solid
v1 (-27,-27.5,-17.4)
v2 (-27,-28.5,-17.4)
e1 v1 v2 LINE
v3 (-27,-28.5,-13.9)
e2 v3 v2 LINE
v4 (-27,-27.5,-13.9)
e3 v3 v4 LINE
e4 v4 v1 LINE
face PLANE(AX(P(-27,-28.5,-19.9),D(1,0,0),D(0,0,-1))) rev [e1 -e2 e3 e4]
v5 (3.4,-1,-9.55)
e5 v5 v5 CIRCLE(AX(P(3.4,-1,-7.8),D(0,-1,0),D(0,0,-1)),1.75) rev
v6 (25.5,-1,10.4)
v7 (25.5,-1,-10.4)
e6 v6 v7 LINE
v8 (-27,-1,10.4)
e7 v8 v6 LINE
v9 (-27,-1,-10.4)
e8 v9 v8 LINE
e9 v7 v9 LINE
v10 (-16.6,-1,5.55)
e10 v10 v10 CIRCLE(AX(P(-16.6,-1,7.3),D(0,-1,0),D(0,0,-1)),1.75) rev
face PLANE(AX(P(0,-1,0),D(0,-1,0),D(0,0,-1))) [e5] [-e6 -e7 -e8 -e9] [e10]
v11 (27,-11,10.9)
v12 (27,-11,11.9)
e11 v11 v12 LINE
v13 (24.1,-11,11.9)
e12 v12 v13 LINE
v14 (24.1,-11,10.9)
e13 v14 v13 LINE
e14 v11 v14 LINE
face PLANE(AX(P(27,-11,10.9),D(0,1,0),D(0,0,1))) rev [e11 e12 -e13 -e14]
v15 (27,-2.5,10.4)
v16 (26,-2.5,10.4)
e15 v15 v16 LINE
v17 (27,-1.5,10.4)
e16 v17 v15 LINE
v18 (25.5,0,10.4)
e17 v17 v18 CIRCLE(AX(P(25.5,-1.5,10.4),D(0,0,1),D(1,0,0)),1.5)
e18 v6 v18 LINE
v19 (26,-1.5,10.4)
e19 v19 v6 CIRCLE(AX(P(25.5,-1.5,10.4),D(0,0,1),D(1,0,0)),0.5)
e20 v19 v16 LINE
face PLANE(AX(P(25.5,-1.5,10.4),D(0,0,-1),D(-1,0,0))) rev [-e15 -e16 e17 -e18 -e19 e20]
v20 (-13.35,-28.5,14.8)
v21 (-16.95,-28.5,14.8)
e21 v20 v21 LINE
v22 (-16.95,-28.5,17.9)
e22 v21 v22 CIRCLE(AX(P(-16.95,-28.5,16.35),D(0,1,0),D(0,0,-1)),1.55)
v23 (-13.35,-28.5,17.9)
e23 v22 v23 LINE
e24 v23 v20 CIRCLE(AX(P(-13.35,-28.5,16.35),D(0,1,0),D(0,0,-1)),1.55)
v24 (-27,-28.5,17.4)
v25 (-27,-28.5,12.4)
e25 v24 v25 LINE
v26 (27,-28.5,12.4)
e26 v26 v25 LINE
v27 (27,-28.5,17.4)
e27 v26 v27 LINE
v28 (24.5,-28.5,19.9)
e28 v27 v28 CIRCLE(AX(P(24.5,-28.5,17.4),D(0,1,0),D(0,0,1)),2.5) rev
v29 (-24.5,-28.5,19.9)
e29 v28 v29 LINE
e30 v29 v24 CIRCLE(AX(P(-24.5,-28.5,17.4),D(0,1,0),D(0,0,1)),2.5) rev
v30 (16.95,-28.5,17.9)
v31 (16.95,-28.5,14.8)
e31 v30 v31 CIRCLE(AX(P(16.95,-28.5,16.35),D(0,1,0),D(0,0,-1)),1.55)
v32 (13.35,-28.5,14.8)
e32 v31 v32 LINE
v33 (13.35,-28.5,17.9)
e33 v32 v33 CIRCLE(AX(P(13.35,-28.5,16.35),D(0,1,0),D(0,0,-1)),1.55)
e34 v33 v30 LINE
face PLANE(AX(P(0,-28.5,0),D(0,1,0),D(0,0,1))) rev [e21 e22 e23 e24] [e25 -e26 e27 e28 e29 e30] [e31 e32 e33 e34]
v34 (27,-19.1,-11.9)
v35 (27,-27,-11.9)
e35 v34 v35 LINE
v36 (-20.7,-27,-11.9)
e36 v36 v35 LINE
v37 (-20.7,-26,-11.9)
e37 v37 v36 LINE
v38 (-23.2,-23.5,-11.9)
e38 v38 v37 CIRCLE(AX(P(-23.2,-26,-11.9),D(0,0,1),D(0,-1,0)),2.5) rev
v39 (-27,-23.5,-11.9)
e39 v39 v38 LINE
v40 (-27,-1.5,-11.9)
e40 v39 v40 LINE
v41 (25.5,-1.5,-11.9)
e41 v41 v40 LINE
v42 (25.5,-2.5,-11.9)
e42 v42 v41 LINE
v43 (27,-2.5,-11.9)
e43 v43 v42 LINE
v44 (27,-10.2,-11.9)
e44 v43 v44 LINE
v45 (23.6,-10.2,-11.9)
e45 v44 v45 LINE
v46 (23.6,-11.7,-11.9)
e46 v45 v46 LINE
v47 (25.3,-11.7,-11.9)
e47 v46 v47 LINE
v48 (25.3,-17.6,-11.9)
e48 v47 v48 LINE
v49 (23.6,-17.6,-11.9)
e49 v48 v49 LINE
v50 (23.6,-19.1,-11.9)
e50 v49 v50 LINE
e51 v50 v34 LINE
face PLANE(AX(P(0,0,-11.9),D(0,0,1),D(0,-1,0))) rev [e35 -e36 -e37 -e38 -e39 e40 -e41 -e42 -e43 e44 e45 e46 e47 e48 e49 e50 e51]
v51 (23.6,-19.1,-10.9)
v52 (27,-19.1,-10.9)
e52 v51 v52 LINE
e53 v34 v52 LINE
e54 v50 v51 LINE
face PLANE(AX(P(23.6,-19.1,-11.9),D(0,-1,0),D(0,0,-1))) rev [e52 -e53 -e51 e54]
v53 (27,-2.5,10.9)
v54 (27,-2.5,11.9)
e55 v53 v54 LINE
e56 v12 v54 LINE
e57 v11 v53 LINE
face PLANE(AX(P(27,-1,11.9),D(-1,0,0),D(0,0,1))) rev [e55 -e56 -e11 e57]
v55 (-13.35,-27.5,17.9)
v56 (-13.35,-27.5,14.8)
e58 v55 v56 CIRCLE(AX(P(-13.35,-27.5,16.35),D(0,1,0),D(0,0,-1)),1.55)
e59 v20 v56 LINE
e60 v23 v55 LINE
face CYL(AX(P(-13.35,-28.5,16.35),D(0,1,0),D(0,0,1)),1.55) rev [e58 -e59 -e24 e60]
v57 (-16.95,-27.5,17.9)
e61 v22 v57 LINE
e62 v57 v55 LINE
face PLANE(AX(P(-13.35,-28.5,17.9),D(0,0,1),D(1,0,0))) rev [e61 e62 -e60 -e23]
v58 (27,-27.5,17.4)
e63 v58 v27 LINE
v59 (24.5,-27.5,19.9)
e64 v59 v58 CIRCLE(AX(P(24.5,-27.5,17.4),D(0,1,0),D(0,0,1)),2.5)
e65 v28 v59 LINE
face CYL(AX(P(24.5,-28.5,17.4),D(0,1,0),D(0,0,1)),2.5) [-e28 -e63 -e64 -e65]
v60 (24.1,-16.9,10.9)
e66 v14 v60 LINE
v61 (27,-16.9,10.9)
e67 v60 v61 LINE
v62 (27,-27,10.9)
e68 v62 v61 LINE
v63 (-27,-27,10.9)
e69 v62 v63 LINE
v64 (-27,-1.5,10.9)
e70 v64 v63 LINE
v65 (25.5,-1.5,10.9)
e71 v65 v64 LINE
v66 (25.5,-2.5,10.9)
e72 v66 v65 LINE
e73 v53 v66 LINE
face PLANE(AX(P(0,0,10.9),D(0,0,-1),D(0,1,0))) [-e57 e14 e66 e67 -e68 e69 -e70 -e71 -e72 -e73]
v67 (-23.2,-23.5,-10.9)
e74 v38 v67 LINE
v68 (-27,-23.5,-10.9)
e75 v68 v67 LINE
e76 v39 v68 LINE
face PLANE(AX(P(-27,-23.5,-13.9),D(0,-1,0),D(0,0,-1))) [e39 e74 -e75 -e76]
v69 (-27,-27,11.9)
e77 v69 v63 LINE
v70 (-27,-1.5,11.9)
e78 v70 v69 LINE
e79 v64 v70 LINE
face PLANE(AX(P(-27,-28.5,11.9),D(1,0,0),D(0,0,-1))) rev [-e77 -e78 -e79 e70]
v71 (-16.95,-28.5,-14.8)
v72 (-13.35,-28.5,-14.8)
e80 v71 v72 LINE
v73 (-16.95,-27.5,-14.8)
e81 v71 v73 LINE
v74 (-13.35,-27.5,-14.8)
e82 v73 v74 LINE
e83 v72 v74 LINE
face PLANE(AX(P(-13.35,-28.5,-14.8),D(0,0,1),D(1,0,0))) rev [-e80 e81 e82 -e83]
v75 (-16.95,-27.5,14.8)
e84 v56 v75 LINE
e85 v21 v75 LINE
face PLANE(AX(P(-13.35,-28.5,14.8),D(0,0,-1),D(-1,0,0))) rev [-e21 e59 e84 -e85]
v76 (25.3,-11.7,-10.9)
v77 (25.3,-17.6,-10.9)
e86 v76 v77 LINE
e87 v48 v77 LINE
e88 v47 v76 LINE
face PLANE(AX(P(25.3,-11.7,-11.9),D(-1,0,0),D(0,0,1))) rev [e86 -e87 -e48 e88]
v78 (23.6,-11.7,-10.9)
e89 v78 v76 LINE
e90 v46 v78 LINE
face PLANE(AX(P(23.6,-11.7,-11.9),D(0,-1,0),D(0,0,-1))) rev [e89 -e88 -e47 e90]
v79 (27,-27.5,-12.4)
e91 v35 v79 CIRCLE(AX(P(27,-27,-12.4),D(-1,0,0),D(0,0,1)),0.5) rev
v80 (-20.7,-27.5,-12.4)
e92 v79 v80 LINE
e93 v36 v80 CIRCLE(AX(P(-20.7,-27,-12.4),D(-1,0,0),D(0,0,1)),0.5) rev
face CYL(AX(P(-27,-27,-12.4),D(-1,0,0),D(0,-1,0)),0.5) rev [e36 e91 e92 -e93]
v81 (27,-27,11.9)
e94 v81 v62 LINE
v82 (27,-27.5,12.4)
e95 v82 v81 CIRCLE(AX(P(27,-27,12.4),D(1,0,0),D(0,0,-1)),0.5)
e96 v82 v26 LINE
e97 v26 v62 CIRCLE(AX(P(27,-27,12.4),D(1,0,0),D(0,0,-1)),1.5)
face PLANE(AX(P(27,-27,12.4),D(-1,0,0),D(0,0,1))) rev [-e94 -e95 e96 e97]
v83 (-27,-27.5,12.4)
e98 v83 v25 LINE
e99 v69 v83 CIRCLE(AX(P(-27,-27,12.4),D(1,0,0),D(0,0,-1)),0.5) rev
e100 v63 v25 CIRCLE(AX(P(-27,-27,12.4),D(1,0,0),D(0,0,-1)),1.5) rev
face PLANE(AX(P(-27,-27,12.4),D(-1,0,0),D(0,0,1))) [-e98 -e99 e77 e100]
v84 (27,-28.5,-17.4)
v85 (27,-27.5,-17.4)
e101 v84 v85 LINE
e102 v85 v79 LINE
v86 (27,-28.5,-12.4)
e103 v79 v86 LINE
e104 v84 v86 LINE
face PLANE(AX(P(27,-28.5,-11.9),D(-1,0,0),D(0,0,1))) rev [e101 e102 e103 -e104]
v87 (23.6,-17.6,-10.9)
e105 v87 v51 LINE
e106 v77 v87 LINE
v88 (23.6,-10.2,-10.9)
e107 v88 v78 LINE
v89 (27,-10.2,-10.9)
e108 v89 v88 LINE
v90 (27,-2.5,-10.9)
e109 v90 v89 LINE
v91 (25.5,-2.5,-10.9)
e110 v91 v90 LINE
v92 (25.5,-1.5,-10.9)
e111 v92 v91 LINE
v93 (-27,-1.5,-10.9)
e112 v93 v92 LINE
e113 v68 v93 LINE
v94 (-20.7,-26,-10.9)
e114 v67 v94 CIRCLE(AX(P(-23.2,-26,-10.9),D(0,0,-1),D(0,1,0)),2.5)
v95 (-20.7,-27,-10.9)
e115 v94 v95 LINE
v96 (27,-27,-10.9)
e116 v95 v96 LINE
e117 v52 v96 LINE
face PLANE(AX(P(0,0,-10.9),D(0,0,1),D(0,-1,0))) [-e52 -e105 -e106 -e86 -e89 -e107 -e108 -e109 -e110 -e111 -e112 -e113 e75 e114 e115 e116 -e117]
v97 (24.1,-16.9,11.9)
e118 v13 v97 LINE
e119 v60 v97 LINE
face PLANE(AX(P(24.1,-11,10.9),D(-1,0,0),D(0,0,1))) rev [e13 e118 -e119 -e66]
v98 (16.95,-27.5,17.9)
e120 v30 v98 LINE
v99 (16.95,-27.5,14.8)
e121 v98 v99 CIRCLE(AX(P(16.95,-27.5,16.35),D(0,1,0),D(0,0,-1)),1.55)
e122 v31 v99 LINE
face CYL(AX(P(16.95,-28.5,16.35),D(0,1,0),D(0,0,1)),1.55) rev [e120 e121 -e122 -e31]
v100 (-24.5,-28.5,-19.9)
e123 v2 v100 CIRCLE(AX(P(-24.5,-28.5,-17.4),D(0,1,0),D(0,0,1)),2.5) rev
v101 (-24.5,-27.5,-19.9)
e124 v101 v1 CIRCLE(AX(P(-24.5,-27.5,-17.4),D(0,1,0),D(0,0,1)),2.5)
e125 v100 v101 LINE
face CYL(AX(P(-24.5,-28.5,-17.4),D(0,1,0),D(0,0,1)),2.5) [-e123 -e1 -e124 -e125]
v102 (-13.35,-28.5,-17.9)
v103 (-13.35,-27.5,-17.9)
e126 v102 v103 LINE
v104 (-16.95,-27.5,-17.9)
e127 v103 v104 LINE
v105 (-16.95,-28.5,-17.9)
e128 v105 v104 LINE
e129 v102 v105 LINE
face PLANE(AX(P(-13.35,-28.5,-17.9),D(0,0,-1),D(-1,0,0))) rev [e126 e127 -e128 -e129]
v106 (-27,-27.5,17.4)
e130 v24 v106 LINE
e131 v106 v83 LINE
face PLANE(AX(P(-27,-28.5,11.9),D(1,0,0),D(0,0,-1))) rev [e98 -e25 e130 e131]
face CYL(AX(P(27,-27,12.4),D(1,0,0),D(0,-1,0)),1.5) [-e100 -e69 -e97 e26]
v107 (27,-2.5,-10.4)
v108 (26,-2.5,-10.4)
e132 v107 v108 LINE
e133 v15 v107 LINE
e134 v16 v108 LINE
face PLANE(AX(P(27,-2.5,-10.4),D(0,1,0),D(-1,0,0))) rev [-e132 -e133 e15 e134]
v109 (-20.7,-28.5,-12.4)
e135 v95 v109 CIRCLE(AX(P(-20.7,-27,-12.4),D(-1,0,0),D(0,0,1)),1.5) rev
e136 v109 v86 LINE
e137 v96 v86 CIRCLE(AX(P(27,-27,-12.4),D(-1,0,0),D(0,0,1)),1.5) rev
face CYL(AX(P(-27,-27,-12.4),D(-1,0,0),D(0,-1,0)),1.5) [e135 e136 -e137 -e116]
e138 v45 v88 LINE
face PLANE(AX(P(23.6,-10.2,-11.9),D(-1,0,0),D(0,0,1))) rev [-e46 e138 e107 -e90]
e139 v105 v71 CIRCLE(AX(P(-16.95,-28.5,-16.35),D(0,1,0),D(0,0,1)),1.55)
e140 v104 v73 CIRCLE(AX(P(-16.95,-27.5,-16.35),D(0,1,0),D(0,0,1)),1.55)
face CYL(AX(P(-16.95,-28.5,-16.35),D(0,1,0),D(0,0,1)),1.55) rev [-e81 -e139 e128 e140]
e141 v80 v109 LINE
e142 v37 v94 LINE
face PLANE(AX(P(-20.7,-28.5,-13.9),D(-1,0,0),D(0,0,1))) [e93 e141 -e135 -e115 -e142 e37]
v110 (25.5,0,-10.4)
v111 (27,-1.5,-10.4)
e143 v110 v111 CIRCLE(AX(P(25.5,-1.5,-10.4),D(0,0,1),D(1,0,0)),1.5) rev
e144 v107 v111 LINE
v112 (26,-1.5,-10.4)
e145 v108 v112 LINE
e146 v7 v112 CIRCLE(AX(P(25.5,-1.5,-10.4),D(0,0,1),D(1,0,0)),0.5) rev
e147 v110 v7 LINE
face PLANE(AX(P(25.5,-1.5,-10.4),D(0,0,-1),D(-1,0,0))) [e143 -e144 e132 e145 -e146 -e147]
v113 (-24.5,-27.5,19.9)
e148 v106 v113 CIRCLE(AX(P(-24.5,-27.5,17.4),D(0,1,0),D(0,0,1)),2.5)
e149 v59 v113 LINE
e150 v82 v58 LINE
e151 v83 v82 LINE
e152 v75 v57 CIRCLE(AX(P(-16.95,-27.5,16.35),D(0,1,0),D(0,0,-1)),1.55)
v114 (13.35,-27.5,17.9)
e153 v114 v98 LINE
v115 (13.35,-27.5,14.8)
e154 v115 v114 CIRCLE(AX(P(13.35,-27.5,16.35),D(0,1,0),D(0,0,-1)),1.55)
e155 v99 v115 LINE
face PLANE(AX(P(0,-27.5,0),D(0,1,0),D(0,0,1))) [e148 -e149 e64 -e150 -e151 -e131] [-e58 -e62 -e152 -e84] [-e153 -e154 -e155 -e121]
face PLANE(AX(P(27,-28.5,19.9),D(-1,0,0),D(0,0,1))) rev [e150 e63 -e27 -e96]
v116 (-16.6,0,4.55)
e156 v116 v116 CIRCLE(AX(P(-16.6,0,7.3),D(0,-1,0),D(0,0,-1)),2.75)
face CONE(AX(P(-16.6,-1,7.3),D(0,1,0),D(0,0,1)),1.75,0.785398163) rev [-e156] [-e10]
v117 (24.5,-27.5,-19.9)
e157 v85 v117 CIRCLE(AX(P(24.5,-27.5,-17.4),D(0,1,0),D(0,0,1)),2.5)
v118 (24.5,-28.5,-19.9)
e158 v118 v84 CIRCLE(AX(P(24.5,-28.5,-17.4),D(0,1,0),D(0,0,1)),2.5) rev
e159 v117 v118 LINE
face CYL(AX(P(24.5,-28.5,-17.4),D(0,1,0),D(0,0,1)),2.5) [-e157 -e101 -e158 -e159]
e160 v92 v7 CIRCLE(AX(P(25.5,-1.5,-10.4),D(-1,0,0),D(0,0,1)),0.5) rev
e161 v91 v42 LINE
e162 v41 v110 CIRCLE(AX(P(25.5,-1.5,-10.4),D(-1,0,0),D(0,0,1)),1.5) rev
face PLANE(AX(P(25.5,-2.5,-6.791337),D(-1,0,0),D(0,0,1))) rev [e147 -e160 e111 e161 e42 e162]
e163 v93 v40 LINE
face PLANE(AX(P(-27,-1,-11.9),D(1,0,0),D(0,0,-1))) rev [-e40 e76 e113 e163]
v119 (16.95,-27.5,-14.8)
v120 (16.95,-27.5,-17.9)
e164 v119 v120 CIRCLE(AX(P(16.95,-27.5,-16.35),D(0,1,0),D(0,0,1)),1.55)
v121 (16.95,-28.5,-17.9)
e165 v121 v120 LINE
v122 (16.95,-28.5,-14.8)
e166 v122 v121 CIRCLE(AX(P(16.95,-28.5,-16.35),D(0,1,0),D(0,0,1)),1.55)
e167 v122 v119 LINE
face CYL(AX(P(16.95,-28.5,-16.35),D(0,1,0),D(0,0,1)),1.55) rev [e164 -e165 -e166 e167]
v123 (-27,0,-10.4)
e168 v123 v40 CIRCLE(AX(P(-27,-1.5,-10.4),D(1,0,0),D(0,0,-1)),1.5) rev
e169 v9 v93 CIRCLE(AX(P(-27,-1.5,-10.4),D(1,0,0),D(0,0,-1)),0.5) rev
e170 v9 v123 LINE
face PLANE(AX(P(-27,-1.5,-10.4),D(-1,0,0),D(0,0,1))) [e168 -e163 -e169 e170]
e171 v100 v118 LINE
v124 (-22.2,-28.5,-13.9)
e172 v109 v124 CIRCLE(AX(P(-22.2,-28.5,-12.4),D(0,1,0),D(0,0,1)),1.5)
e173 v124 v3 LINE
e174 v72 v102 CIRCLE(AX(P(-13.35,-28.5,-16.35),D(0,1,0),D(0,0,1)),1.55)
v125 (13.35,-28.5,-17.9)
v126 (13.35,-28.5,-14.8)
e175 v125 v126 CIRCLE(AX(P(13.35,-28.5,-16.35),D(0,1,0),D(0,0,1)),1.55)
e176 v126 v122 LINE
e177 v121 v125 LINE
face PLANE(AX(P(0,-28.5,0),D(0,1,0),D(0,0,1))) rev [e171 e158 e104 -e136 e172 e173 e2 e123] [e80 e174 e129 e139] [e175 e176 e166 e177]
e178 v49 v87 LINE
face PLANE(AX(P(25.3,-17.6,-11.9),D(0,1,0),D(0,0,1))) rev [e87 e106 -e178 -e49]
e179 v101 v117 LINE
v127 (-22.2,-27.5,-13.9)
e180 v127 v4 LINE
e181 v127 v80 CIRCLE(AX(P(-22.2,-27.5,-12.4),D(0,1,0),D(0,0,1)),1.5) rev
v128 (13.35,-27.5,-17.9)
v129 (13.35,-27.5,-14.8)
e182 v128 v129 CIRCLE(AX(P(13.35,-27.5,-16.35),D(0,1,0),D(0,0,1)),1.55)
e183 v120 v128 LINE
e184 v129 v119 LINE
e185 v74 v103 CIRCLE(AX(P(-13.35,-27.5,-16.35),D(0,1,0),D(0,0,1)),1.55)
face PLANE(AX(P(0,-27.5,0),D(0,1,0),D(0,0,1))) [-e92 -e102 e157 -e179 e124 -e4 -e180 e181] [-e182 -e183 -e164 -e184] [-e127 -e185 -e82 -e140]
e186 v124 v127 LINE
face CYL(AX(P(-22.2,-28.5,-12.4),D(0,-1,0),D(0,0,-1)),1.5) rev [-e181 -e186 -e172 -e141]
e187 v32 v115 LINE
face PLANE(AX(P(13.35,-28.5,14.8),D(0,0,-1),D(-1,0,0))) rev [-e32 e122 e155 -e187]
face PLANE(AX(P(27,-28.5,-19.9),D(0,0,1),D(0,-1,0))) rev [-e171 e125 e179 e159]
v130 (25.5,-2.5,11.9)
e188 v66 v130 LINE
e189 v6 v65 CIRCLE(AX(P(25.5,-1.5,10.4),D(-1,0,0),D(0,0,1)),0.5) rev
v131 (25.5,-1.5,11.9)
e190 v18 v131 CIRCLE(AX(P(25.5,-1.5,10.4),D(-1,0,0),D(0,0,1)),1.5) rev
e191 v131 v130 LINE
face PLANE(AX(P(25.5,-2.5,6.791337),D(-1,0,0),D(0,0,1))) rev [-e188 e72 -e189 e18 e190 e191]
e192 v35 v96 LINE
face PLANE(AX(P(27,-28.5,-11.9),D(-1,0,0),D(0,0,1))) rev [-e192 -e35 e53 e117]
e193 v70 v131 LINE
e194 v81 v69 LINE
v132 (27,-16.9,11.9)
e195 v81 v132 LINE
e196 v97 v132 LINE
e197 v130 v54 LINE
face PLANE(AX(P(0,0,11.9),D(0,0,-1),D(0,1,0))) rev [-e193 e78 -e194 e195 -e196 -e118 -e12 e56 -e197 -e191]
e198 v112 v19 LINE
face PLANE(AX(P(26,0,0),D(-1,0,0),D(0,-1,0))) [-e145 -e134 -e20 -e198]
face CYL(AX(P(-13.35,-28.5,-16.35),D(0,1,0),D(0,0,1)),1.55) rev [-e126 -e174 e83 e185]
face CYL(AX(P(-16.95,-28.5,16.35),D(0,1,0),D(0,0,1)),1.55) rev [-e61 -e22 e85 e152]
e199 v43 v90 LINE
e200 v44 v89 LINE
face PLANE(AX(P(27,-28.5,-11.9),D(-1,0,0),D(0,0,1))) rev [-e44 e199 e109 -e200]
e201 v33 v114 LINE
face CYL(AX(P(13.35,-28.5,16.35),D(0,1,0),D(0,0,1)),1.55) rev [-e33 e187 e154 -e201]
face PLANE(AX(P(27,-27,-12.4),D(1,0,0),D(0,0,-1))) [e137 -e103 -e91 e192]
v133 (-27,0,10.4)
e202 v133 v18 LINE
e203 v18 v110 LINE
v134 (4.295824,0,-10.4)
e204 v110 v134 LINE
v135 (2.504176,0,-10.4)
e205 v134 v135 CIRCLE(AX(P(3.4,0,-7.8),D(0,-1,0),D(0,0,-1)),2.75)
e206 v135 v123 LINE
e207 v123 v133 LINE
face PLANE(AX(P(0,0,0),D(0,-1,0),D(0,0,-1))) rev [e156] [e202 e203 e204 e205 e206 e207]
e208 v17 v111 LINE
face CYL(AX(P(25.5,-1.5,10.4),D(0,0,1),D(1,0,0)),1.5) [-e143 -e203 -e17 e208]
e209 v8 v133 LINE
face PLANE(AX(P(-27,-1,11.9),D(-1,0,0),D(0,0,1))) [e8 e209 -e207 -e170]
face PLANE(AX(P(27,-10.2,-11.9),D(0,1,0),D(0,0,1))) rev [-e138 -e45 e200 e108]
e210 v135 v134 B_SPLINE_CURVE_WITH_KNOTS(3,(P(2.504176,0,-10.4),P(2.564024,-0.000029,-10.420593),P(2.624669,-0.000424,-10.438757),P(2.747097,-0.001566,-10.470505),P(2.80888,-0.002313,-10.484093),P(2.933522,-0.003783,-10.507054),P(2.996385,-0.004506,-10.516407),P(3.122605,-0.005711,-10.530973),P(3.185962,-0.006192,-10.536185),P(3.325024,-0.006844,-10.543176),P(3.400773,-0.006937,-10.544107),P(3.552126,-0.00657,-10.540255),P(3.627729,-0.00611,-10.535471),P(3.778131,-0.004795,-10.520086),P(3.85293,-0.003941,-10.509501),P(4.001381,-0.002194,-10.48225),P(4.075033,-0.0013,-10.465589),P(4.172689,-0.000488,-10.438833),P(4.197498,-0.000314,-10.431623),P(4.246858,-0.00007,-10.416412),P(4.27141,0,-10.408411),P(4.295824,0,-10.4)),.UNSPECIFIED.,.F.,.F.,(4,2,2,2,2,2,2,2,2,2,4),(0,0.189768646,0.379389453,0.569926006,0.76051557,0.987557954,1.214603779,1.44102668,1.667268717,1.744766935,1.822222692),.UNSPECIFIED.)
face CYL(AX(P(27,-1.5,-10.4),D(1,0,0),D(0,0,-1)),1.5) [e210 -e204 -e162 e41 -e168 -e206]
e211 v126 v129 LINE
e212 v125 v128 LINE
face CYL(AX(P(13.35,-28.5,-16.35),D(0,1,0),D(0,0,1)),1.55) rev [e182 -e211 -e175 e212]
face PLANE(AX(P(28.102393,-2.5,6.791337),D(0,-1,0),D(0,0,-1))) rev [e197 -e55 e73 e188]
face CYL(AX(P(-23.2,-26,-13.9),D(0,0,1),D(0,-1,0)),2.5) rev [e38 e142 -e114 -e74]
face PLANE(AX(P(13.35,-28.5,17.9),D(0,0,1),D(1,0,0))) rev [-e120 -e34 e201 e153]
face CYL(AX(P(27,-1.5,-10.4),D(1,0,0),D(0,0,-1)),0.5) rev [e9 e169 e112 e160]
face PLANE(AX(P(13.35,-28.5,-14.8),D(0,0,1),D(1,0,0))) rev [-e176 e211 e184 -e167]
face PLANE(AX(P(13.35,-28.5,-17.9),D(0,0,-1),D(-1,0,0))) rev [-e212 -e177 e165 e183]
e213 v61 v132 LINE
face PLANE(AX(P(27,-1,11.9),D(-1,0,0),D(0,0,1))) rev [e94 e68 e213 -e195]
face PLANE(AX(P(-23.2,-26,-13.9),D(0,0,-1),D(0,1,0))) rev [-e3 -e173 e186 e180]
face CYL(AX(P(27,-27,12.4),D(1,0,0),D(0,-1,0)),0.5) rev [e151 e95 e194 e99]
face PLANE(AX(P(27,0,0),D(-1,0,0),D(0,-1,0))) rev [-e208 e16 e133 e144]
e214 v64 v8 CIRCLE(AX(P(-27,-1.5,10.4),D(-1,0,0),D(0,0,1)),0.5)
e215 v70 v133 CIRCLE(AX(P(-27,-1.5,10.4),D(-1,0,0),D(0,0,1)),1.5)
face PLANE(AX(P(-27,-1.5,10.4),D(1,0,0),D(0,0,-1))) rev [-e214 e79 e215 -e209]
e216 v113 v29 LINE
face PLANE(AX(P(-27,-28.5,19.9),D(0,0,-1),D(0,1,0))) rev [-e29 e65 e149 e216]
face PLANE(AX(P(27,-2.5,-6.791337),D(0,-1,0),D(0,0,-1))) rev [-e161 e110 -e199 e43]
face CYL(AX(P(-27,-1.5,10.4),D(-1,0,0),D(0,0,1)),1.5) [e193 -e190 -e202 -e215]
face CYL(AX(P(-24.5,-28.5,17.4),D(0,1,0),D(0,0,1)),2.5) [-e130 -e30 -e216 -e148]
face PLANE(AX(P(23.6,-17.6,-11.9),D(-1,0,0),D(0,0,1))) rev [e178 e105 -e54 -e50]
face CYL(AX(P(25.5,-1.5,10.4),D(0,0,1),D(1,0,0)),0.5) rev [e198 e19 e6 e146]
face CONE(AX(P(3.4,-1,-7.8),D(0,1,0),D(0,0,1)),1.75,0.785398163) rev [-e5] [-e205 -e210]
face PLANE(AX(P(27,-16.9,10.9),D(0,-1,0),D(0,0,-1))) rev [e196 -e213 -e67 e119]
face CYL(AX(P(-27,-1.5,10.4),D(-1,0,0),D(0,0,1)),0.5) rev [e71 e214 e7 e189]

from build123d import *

# Parameters (mm, degrees)
SKETCH1_W                      = 54
SKETCH1_H                      = 23.8
BASE_FLANGE1_DEPTH             = 1
EDGE_FLANGE1_STRIP_W           = 5
EDGE_FLANGE1_STRIP_H           = 1
EDGE_FLANGE1_STRIP_CUT_DEPTH   = 54
EDGE_FLANGE1_STRIP_2_W         = 5
EDGE_FLANGE1_STRIP_2_H         = 1
EDGE_FLANGE1_STRIP_CUT_2_DEPTH = 54
EDGE_FLANGE1_DEPTH             = 54
EDGE_FLANGE1_BEND_DEPTH        = 54
EDGE_FLANGE2_STRIP_W           = 5
EDGE_FLANGE2_STRIP_H           = 1
EDGE_FLANGE2_STRIP_CUT_DEPTH   = 20.8
EDGE_FLANGE2_DEPTH             = 20.8
CUT_EXTRUDE1_START             = -1.5
CUT_EXTRUDE1_DEPTH             = 1.5
CUT_EXTRUDE2_START             = -1.5
CUT_EXTRUDE2_DEPTH             = 1.5
EDGE_FLANGE3_STRIP_W           = 5
EDGE_FLANGE3_STRIP_H           = 1
EDGE_FLANGE3_STRIP_CUT_DEPTH   = 54
EDGE_FLANGE3_STRIP_2_W         = 5
EDGE_FLANGE3_STRIP_2_H         = 1
EDGE_FLANGE3_STRIP_CUT_2_DEPTH = 54
EDGE_FLANGE3_DEPTH             = 54
EDGE_FLANGE3_BEND_DEPTH        = 54
BREAK_CORNER1_START            = -28.5
BREAK_CORNER1_DEPTH            = 1
CUT_EXTRUDE3_DEPTH             = 10
CUT_EXTRUDE4_DEPTH             = 2
CUT_EXTRUDE4_DEPTH_BACK        = 2
BREAK_CORNER2_START            = -28.5
BREAK_CORNER2_DEPTH            = 1
CUT_EXTRUDE5_DEPTH             = 1
SKETCH26_W                     = 2.9
SKETCH26_H                     = 5.9
CUT_EXTRUDE6_DEPTH             = 1
SKETCH27_R                     = 1.6
CUT_EXTRUDE7_DEPTH             = 1
MOVE_FACE1_BY                  = 0.15
MOVE_FACE1_2_BY                = 0.15
CHAMFER1_SIZE                  = 1
CHAMFER2_SIZE                  = 1


# Read off the part's stored shape, not the designer's step: Break-Corner1, Break-Corner2
# Sheet-metal steps are written as plain solids
# Some blends are built 0.0001 mm under size
with BuildPart() as part:
    # Sketch1 → Base-Flange1 (new body)
    with BuildSketch(Plane(origin=(0, 0, 0), x_dir=(1, 0, 0), z_dir=(0, 1, 0))):
        Rectangle(SKETCH1_W, SKETCH1_H)
    extrude(amount=-BASE_FLANGE1_DEPTH)

    # Edge-Flange1 strip (across the edge) → Edge-Flange1 strip cut (cut)
    with BuildSketch(Plane(origin=(27, -1, 11.9), x_dir=(0, 0, -1), z_dir=(-1, 0, 0))):
        with Locations((-1, -0.5)):
            Rectangle(EDGE_FLANGE1_STRIP_W, EDGE_FLANGE1_STRIP_H)
    extrude(amount=EDGE_FLANGE1_STRIP_CUT_DEPTH, mode=Mode.SUBTRACT)

    # Edge-Flange1 strip 2 (across the edge) → Edge-Flange1 strip cut 2 (cut)
    with BuildSketch(Plane(origin=(-27, -1, -11.9), x_dir=(0, 0, 1), z_dir=(1, 0, 0))):
        with Locations((-1, -0.5)):
            Rectangle(EDGE_FLANGE1_STRIP_2_W, EDGE_FLANGE1_STRIP_2_H)
    extrude(amount=EDGE_FLANGE1_STRIP_CUT_2_DEPTH, mode=Mode.SUBTRACT)

    # Edge-Flange1 section (across the edge) → Edge-Flange1 (add)
    with BuildSketch(Plane(origin=(27, -1, 11.9), x_dir=(0, 0, -1), z_dir=(-1, 0, 0))):
        with BuildLine():
            Line((0, 0.5), (0, 27.5))
            Line((0, 27.5), (1, 27.5))
            Line((1, 27.5), (1, 0.5))
            ThreePointArc((1, 0.5), (1.146446609, 0.146446609), (1.5, 0))
            Line((1.5, 0), (1.5, -1))
            ThreePointArc((1.5, -1), (0.439339828, -0.560660172), (0, 0.5))
        make_face()
    extrude(amount=EDGE_FLANGE1_DEPTH)

    # Edge-Flange1 section 2 (across the edge) → Edge-Flange1 bend (add)
    with BuildSketch(Plane(origin=(-27, -1, -11.9), x_dir=(0, 0, 1), z_dir=(1, 0, 0))):
        with BuildLine():
            Line((0, 0.5), (0, 27.5))
            Line((0, 27.5), (1, 27.5))
            Line((1, 27.5), (1, 0.5))
            ThreePointArc((1, 0.5), (1.146446609, 0.146446609), (1.5, 0))
            Line((1.5, 0), (1.5, -1))
            ThreePointArc((1.5, -1), (0.439339828, -0.560660172), (0, 0.5))
        make_face()
    extrude(amount=EDGE_FLANGE1_BEND_DEPTH)

    # Edge-Flange2 strip (across the edge) → Edge-Flange2 strip cut (cut)
    with BuildSketch(Plane(origin=(27, -1, -10.4), x_dir=(-1, 0, 0), z_dir=(0, 0, 1))):
        with Locations((-1, -0.5)):
            Rectangle(EDGE_FLANGE2_STRIP_W, EDGE_FLANGE2_STRIP_H)
    extrude(amount=EDGE_FLANGE2_STRIP_CUT_DEPTH, mode=Mode.SUBTRACT)

    # Edge-Flange2 section (across the edge) → Edge-Flange2 (add)
    with BuildSketch(Plane(origin=(27, -1, -10.4), x_dir=(-1, 0, 0), z_dir=(0, 0, 1))):
        with BuildLine():
            Line((0, 0.5), (0, 1.5))
            Line((0, 1.5), (1, 1.5))
            Line((1, 1.5), (1, 0.5))
            ThreePointArc((1, 0.5), (1.146446609, 0.146446609), (1.5, 0))
            Line((1.5, 0), (1.5, -1))
            ThreePointArc((1.5, -1), (0.439339828, -0.560660172), (0, 0.5))
        make_face()
    extrude(amount=EDGE_FLANGE2_DEPTH)

    # Sketch15 → Cut-Extrude1 (cut)
    with BuildSketch(Plane(origin=(0, 0, -11.9), x_dir=(-1, 0, 0), z_dir=(0, 0, -1)).offset(CUT_EXTRUDE1_START)):
        Polygon((-27, -2.5), (-25.5, -2.5), (-25.5, 0), (-28.102393481, 0), (-28.102393481, -2.5), align=None)
    extrude(amount=CUT_EXTRUDE1_DEPTH, mode=Mode.SUBTRACT)

    # Sketch16 → Cut-Extrude2 (cut)
    with BuildSketch(Plane.XY.offset(11.9).offset(CUT_EXTRUDE2_START)):
        Polygon((25.5, -2.5), (25.5, 0), (28.102393481, 0), (28.102393481, -2.5), (27, -2.5), align=None)
    extrude(amount=CUT_EXTRUDE2_DEPTH, mode=Mode.SUBTRACT)

    # Edge-Flange3 strip (across the edge) → Edge-Flange3 strip cut (cut)
    with BuildSketch(Plane(origin=(-27, -28.5, 11.9), x_dir=(0, 1, 0), z_dir=(1, 0, 0))):
        with Locations((-1, -0.5)):
            Rectangle(EDGE_FLANGE3_STRIP_W, EDGE_FLANGE3_STRIP_H)
    extrude(amount=EDGE_FLANGE3_STRIP_CUT_DEPTH, mode=Mode.SUBTRACT)

    # Edge-Flange3 strip 2 (across the edge) → Edge-Flange3 strip cut 2 (cut)
    with BuildSketch(Plane(origin=(27, -28.5, -11.9), x_dir=(0, 1, 0), z_dir=(-1, 0, 0))):
        with Locations((-1, -0.5)):
            Rectangle(EDGE_FLANGE3_STRIP_2_W, EDGE_FLANGE3_STRIP_2_H)
    extrude(amount=EDGE_FLANGE3_STRIP_CUT_2_DEPTH, mode=Mode.SUBTRACT)

    # Edge-Flange3 section (across the edge) → Edge-Flange3 (add)
    with BuildSketch(Plane(origin=(-27, -28.5, 11.9), x_dir=(0, 1, 0), z_dir=(1, 0, 0))):
        with BuildLine():
            Line((0, 0.5), (0, 8))
            Line((0, 8), (1, 8))
            Line((1, 8), (1, 0.5))
            ThreePointArc((1, 0.5), (1.146446609, 0.146446609), (1.5, 0))
            Line((1.5, 0), (1.5, -1))
            ThreePointArc((1.5, -1), (0.439339828, -0.560660172), (0, 0.5))
        make_face()
    extrude(amount=EDGE_FLANGE3_DEPTH)

    # Edge-Flange3 section 2 (across the edge) → Edge-Flange3 bend (add)
    with BuildSketch(Plane(origin=(27, -28.5, -11.9), x_dir=(0, 1, 0), z_dir=(-1, 0, 0))):
        with BuildLine():
            Line((0, 0.5), (0, 8))
            Line((0, 8), (1, 8))
            Line((1, 8), (1, 0.5))
            ThreePointArc((1, 0.5), (1.146446609, 0.146446609), (1.5, 0))
            Line((1.5, 0), (1.5, -1))
            ThreePointArc((1.5, -1), (0.439339828, -0.560660172), (0, 0.5))
        make_face()
    extrude(amount=EDGE_FLANGE3_BEND_DEPTH)

    # Break-Corner1 outline → Break-Corner1 (cut)
    with BuildSketch(Plane(origin=(0, 0, 0), x_dir=(1, 0, 0), z_dir=(0, 1, 0)).offset(BREAK_CORNER1_START)):
        with BuildLine():
            Line((-27, -19.9), (-24.5, -19.9))
            ThreePointArc((-24.5, -19.9), (-26.267766953, -19.167766953), (-27, -17.4))
            Line((-27, -17.4), (-27, -19.9))
        make_face()
        with BuildLine():
            ThreePointArc((27, -17.4), (26.267766953, -19.167766953), (24.5, -19.9))
            Line((24.5, -19.9), (27, -19.9))
            Line((27, -19.9), (27, -17.4))
        make_face()
        with BuildLine():
            Line((27, 19.9), (24.5, 19.9))
            ThreePointArc((24.5, 19.9), (26.267766953, 19.167766953), (27, 17.4))
            Line((27, 17.4), (27, 19.9))
        make_face()
        with BuildLine():
            ThreePointArc((-27, 17.4), (-26.267766953, 19.167766953), (-24.5, 19.9))
            Line((-24.5, 19.9), (-27, 19.9))
            Line((-27, 19.9), (-27, 17.4))
        make_face()
    extrude(amount=BREAK_CORNER1_DEPTH, mode=Mode.SUBTRACT)

    # Sketch23 → Cut-Extrude3 (cut)
    with BuildSketch(Plane(origin=(0, -27.5, 0), x_dir=(1, 0, 0), z_dir=(0, 1, 0))):
        with BuildLine():
            Line((13.35, 17.9), (16.95, 17.9))
            ThreePointArc((16.95, 17.9), (18.5, 16.35), (16.95, 14.8))
            Line((16.95, 14.8), (13.35, 14.8))
            ThreePointArc((13.35, 14.8), (11.8, 16.35), (13.35, 17.9))
        make_face()
        with BuildLine():
            Line((-13.35, 14.8), (-16.95, 14.8))
            ThreePointArc((-16.95, 14.8), (-18.5, 16.35), (-16.95, 17.9))
            Line((-16.95, 17.9), (-13.35, 17.9))
            ThreePointArc((-13.35, 17.9), (-11.8, 16.35), (-13.35, 14.8))
        make_face()
        with BuildLine():
            Line((13.35, -17.9), (16.95, -17.9))
            ThreePointArc((16.95, -17.9), (18.5, -16.35), (16.95, -14.8))
            Line((16.95, -14.8), (13.35, -14.8))
            ThreePointArc((13.35, -14.8), (11.8, -16.35), (13.35, -17.9))
        make_face()
        with BuildLine():
            Line((-13.35, -14.8), (-16.95, -14.8))
            ThreePointArc((-16.95, -14.8), (-18.5, -16.35), (-16.95, -17.9))
            Line((-16.95, -17.9), (-13.35, -17.9))
            ThreePointArc((-13.35, -17.9), (-11.8, -16.35), (-13.35, -14.8))
        make_face()
    extrude(amount=-CUT_EXTRUDE3_DEPTH, mode=Mode.SUBTRACT)

    # Sketch24 → Cut-Extrude4 (cut, two sides: drawn at the far end of the back side and taken through both)
    with BuildSketch(Plane(origin=(0, 0, -11.9), x_dir=(-1, 0, 0), z_dir=(0, 0, -1)).offset(-CUT_EXTRUDE4_DEPTH_BACK)):
        with BuildLine():
            Line((27, -28.5), (20.7, -28.5))
            Line((20.7, -28.5), (20.7, -26))
            ThreePointArc((20.7, -26), (21.432233047, -24.232233047), (23.2, -23.5))
            Line((23.2, -23.5), (27, -23.5))
            Line((27, -23.5), (27, -28.5))
        make_face()
    extrude(amount=CUT_EXTRUDE4_DEPTH + CUT_EXTRUDE4_DEPTH_BACK, mode=Mode.SUBTRACT)

    # Break-Corner2 outline → Break-Corner2 (add)
    with BuildSketch(Plane(origin=(0, 0, 0), x_dir=(1, 0, 0), z_dir=(0, 1, 0)).offset(BREAK_CORNER2_START)):
        with BuildLine():
            Line((-20.7, 13.9), (-22.2, 13.9))
            ThreePointArc((-22.2, 13.9), (-21.139339828, 13.460660172), (-20.7, 12.4))
            Line((-20.7, 12.4), (-20.7, 13.9))
        make_face()
    extrude(amount=BREAK_CORNER2_DEPTH)

    # Sketch25 → Cut-Extrude5 (cut)
    with BuildSketch(Plane.XY.offset(-10.9)):
        Polygon((27, -10.2), (23.6, -10.2), (23.6, -11.7), (25.3, -11.7), (25.3, -17.6), (23.6, -17.6), (23.6, -19.1), (27, -19.1), align=None)
    extrude(amount=-CUT_EXTRUDE5_DEPTH, mode=Mode.SUBTRACT)

    # Sketch26 → Cut-Extrude6 (cut)
    with BuildSketch(Plane.XY.offset(11.9)):
        with Locations((25.55, -13.95)):
            Rectangle(SKETCH26_W, SKETCH26_H)
    extrude(amount=-CUT_EXTRUDE6_DEPTH, mode=Mode.SUBTRACT)

    # Sketch27 → Cut-Extrude7 (cut)
    with BuildSketch(Plane(origin=(0, 0, 0), x_dir=(1, 0, 0), z_dir=(0, 1, 0))):
        with Locations(Location((-16.6, -7.3, 0), (0, 0, 270))):
            Circle(SKETCH27_R)
        with Locations(Location((3.4, 7.8, 0), (0, 0, 270))):
            Circle(SKETCH27_R)
    extrude(amount=-CUT_EXTRUDE7_DEPTH, mode=Mode.SUBTRACT)

    # Move Face1: a curved face moved inward by 0.15
    add(Solid.thicken(part.faces().sort_by_distance((3.4, -0.5, -9.4))[0], -MOVE_FACE1_BY), mode=Mode.SUBTRACT)

    # Move Face1 2: a curved face moved inward by 0.15
    add(Solid.thicken(part.faces().sort_by_distance((-16.6, -0.5, 5.7))[0], -MOVE_FACE1_2_BY), mode=Mode.SUBTRACT)

    # Chamfer1
    chamfer1_edges = [part.edges().sort_by_distance(p)[0] for p in [
        (-16.6, 0, 5.55),
    ]]
    chamfer(chamfer1_edges, length=CHAMFER1_SIZE - 0.0001)  # a hair under: the kernel refuses the full size

    # Chamfer2
    # the kernel refuses this chamfer: 1 mm, written as the material it takes off along each edge
    with BuildSketch(Plane(origin=(3.4, 0, -7.8), x_dir=(0, 0, 1), z_dir=(-1, 0, 0))) as chamfer2_piece_1:
        Polygon((1.75 + CHAMFER2_SIZE, 0), (1.75, -CHAMFER2_SIZE), (1.75, 0), align=None)
    revolve(axis=Axis((3.4, 0, -7.8), (0, 1, 0)), mode=Mode.SUBTRACT)


solid = part.part
